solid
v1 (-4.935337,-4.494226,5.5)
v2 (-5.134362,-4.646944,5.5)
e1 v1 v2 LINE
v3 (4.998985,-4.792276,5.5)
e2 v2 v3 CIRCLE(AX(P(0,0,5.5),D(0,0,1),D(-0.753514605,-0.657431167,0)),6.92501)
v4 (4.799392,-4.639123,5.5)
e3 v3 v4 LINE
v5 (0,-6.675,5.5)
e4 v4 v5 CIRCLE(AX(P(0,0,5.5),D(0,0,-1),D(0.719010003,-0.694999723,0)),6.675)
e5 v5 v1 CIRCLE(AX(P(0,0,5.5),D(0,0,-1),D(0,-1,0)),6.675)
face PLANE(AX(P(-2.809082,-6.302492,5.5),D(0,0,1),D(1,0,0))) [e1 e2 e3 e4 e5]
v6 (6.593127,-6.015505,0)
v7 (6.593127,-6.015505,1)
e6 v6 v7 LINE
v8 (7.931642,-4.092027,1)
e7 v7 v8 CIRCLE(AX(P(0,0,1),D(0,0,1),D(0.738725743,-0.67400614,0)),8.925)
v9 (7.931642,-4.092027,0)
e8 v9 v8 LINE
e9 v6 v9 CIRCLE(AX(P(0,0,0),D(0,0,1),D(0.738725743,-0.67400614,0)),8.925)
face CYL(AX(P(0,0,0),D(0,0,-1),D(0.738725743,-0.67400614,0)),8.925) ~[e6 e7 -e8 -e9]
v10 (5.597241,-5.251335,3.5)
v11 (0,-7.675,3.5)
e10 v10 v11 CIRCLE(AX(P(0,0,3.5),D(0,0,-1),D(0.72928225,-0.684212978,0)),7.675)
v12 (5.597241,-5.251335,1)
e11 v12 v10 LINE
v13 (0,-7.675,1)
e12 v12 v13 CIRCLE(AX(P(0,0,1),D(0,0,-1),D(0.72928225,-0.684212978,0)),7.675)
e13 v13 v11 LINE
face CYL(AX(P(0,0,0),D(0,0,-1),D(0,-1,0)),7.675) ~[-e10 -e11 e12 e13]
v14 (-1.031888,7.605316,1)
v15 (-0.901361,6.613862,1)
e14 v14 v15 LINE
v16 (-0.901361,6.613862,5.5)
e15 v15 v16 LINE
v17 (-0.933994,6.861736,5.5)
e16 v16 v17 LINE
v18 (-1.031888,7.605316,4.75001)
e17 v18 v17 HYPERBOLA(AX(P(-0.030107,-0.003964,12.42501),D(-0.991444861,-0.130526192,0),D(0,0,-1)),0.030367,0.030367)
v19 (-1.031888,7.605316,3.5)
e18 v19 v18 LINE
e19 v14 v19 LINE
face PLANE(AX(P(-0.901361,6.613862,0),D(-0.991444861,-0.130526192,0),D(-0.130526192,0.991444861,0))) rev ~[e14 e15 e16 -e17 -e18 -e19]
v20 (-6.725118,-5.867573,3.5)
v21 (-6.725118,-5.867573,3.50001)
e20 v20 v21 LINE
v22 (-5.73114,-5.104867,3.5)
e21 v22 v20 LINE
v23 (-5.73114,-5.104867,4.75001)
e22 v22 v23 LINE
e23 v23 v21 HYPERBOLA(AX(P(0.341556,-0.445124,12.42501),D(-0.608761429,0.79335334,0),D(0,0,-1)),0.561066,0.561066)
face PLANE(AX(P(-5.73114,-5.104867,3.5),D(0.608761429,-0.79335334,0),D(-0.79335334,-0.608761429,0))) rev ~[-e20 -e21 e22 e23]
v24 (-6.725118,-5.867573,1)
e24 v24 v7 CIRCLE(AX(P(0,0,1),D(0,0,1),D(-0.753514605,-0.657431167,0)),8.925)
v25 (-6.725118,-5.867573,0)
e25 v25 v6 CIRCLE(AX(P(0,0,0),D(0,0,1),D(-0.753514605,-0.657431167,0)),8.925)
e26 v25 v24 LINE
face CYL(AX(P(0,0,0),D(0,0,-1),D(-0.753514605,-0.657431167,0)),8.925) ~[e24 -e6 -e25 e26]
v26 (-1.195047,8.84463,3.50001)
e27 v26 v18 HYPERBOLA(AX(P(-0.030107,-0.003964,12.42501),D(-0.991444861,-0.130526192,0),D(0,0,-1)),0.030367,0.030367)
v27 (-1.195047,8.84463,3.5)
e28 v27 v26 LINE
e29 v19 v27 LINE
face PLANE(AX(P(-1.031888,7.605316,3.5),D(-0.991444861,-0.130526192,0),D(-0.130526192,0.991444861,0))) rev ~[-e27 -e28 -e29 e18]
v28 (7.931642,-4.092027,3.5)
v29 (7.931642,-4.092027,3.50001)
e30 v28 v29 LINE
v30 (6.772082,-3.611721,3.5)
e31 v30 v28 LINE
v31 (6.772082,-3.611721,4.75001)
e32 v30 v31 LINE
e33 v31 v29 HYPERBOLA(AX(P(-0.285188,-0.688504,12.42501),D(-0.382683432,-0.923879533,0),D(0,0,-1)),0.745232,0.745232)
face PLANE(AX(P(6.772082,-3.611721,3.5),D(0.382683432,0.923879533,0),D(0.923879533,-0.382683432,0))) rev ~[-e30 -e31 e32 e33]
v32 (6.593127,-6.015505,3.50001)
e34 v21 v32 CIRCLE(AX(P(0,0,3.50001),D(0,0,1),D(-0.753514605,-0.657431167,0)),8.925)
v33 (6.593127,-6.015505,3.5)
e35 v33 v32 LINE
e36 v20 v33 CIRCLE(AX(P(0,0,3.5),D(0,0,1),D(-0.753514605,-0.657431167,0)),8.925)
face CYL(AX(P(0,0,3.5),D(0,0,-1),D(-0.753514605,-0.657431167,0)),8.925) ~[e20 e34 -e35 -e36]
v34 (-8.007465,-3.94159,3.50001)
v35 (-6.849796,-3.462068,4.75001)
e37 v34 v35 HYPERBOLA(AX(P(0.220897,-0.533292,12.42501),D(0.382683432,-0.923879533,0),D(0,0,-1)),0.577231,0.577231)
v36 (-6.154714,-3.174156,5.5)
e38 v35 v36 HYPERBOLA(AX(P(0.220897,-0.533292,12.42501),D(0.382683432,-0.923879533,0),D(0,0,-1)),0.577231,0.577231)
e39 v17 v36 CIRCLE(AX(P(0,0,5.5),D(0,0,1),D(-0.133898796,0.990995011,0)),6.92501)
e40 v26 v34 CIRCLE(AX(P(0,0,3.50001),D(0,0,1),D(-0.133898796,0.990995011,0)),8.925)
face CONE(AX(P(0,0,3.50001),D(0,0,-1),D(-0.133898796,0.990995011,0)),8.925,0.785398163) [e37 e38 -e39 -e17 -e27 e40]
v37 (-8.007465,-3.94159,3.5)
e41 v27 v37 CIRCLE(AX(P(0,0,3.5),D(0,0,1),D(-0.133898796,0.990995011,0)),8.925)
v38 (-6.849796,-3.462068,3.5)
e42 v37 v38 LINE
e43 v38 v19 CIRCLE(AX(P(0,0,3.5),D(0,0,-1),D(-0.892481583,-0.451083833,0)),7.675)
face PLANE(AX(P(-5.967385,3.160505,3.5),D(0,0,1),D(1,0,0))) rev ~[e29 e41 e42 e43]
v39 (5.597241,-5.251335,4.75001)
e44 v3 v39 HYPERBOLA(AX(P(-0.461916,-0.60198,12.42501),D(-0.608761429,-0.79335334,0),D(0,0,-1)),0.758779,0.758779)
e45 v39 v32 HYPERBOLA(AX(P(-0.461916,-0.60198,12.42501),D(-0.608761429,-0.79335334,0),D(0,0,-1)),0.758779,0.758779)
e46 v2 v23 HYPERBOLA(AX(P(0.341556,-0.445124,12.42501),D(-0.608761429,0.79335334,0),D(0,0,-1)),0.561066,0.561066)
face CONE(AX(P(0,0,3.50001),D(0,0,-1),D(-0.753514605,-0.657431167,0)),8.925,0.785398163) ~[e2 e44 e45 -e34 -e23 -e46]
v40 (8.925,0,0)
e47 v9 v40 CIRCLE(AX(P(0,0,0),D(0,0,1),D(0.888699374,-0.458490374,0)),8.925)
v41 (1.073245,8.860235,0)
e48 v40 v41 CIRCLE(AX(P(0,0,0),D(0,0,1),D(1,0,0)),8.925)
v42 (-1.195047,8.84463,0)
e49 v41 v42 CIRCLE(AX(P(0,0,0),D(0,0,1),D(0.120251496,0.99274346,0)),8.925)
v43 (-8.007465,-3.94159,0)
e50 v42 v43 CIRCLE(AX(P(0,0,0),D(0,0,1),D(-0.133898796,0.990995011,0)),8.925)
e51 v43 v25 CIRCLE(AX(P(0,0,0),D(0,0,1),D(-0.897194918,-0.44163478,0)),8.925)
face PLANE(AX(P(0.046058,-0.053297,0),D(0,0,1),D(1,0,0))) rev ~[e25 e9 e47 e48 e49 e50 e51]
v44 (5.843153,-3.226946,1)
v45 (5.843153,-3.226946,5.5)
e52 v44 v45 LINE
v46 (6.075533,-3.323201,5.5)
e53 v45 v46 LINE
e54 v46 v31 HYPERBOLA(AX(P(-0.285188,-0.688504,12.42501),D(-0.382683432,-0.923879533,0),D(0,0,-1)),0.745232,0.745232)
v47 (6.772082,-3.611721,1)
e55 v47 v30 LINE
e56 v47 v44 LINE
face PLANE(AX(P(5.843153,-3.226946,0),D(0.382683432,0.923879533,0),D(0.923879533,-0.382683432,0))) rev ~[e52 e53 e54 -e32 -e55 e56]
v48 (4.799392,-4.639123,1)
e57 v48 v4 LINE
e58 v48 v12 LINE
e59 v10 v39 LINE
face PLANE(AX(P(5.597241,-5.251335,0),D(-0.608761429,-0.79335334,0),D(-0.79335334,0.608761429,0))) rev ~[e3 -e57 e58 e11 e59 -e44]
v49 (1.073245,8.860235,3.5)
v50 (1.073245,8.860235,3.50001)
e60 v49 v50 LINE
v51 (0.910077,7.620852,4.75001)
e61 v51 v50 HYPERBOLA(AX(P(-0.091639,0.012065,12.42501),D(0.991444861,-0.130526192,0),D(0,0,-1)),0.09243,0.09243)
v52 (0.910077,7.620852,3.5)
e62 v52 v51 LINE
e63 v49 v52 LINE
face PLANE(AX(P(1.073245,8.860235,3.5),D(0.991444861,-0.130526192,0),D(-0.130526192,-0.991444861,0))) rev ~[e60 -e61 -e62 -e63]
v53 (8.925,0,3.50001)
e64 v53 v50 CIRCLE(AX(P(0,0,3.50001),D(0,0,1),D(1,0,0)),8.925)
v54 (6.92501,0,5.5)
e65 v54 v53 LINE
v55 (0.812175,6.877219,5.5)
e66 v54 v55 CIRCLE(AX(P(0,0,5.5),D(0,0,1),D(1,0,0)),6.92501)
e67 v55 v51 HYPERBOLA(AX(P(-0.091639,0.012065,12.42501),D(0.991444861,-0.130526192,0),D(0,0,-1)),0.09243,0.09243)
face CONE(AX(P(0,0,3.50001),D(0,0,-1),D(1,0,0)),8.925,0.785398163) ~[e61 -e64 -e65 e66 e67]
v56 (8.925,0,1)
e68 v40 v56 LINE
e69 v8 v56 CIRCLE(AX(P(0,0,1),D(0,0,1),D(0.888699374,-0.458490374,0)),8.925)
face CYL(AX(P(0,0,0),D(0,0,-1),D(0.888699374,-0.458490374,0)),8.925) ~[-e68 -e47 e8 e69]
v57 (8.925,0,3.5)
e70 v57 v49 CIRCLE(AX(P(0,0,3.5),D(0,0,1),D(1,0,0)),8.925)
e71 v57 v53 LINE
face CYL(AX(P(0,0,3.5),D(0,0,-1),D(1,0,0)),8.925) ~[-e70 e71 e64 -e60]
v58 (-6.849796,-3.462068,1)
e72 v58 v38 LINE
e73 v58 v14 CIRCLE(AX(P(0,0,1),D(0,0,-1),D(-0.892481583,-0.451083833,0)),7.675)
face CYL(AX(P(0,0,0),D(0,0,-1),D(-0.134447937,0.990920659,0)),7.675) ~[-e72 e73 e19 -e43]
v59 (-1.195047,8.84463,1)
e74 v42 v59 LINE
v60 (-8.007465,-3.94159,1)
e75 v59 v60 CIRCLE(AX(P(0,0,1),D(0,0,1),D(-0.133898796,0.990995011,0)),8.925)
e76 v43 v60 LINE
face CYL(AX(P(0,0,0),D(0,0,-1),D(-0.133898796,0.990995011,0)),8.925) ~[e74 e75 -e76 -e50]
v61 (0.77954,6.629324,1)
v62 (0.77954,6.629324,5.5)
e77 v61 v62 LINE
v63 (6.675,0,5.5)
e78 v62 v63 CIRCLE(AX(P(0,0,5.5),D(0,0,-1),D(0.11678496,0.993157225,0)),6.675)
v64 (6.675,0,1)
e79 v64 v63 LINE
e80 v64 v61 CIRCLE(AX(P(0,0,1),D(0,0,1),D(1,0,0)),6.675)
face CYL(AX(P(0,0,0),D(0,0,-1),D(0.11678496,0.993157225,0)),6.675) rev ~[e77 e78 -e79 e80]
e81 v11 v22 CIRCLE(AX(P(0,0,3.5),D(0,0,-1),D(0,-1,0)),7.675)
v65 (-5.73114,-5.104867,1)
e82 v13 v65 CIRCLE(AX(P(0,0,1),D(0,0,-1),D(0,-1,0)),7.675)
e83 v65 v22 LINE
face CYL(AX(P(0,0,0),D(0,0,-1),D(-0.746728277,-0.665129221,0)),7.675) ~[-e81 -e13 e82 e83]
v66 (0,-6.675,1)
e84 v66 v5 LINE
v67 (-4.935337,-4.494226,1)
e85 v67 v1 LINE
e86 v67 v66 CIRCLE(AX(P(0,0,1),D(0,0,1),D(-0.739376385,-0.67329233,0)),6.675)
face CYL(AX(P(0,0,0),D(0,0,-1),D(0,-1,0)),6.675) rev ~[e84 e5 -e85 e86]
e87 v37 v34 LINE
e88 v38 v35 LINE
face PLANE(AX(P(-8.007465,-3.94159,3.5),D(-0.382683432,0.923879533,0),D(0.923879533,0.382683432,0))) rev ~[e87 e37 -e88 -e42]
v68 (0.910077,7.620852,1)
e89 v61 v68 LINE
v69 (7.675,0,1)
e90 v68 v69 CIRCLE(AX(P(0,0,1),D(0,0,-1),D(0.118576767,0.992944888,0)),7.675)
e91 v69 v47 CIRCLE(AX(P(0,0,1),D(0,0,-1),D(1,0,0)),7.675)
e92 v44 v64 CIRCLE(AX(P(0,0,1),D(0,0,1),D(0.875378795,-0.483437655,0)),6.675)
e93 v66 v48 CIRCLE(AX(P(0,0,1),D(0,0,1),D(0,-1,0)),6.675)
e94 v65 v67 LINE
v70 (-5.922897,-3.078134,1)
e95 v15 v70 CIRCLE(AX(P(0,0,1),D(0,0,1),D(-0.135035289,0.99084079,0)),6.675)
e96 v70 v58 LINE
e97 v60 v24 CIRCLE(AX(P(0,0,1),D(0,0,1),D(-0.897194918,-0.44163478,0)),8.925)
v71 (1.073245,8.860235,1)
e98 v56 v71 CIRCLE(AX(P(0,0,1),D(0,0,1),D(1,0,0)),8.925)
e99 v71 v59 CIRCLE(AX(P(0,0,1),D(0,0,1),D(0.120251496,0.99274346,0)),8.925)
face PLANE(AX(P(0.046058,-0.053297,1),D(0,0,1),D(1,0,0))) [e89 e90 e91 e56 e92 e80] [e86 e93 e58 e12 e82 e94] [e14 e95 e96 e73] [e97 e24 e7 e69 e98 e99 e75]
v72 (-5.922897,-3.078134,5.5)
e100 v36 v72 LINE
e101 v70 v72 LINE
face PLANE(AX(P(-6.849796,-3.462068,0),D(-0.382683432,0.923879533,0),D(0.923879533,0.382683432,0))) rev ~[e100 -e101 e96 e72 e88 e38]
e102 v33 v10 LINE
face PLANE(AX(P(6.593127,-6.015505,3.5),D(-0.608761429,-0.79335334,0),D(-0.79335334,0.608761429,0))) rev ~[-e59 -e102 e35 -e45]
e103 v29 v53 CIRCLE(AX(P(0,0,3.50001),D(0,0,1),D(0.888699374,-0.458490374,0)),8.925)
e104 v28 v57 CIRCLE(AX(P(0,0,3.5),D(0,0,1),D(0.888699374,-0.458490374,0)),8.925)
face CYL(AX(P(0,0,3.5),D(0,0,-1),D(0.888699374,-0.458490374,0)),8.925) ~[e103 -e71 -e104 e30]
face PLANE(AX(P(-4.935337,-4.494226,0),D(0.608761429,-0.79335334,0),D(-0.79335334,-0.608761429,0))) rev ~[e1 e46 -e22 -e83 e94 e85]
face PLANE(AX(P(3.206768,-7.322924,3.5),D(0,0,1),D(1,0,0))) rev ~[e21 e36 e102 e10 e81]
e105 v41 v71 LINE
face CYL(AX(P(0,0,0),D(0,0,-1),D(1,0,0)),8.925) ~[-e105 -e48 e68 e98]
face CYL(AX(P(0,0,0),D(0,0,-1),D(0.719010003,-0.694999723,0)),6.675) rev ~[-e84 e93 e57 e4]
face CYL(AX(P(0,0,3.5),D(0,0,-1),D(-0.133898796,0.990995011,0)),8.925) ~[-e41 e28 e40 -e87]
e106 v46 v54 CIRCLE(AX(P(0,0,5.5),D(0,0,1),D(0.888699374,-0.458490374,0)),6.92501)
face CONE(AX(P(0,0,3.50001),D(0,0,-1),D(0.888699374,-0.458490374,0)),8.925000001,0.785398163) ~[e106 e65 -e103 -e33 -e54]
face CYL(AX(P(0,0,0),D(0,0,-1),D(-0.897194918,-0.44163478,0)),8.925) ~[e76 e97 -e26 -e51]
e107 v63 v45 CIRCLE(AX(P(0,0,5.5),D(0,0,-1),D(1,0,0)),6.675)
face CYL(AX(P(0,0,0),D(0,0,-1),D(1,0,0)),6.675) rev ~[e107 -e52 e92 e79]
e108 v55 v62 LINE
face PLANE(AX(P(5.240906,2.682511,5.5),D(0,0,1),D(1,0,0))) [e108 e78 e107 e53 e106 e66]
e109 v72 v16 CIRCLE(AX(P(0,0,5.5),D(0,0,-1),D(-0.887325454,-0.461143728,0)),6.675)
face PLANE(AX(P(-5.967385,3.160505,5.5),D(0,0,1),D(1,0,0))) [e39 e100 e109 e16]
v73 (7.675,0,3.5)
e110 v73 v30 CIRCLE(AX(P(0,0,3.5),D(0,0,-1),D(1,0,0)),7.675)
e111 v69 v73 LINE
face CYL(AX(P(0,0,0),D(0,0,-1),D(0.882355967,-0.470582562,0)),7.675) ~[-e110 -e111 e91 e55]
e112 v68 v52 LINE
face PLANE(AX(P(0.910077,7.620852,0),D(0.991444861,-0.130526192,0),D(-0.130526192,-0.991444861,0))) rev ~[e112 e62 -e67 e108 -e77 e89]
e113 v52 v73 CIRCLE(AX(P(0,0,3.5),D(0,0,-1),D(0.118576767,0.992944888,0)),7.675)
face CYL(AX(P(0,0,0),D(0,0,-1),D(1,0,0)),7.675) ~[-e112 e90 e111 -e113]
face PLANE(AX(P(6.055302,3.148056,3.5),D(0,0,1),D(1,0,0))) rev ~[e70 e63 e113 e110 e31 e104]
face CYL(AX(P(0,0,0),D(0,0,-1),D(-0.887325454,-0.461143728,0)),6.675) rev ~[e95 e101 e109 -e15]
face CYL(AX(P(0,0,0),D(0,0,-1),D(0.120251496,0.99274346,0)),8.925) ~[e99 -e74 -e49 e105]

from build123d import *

# Parameters (mm, degrees)
F1_DEPTH = 1
F2_DEPTH = 5.5
F3_START = 3.5
F3_DEPTH = 2
F4_SIZE  = 1.99999


# Not quite as in the source:
# - a fillet or chamfer is up to 0.001 mm smaller than in the source, because OpenCascade refuses the exact size


with BuildPart() as f1:
    # F0 (on Top) → F1 (new body)
    with BuildSketch(Plane.XY):
        with BuildLine():
            ThreePointArc((6.675, 0), (4.9879380463, 4.4357749094), (0.7795396115, 6.6293244749))
            ThreePointArc((0.7795396115, 6.6293244749), (-0.0613991479, 6.6747176079), (-0.9013605528, 6.6138622721))
            ThreePointArc((-0.9013605528, 6.6138622721), (-5.9267464923, 3.0707166942), (-5.9228974074, -3.0781343864))
            ThreePointArc((-5.9228974074, -3.0781343864), (-5.4750931221, -3.8182430914), (-4.9353373694, -4.4942263016))
            ThreePointArc((-4.9353373694, -4.4942263016), (-2.6978384344, -6.1055133103), (0, -6.675))
            ThreePointArc((0, -6.675), (2.6066720123, -6.1449886916), (4.7993917719, -4.6391231521))
            ThreePointArc((4.7993917719, -4.6391231521), (5.3679142179, -3.9675082796), (5.8431534535, -3.2269463459))
            ThreePointArc((5.8431534535, -3.2269463459), (6.4636937699, -1.6662196281), (6.675, 0))
        make_face()
        with BuildLine():
            Line((-5.9228974074, -3.0781343864), (-6.849796149, -3.4620684161))
            ThreePointArc((-6.849796149, -3.4620684161), (-6.3438696558, -4.3198313381), (-5.7311395238, -5.1048667718))
            Line((-5.7311395238, -5.1048667718), (-4.9353373694, -4.4942263016))
            ThreePointArc((-4.9353373694, -4.4942263016), (-5.4750931221, -3.8182430914), (-5.9228974074, -3.0781343864))
        make_face()
        with BuildLine():
            Line((-6.849796149, -3.4620684161), (-8.0074646458, -3.9415904082))
            ThreePointArc((-8.0074646458, -3.9415904082), (-7.4289702623, -4.9463143695), (-6.7251178515, -5.8675731681))
            Line((-6.7251178515, -5.8675731681), (-5.7311395238, -5.1048667718))
            ThreePointArc((-5.7311395238, -5.1048667718), (-6.3438696558, -4.3198313381), (-6.849796149, -3.4620684161))
        make_face()
        with BuildLine():
            Line((0.9100766885, 7.6208520141), (1.0732446043, 8.8602353817))
            ThreePointArc((1.0732446043, 8.8602353817), (-0.0613988555, 8.9247888031), (-1.1950467583, 8.8446304754))
            Line((-1.1950467583, 8.8446304754), (-1.0318879198, 7.6053160566))
            ThreePointArc((-1.0318879198, 7.6053160566), (-0.0613989862, 7.6747544042), (0.9100766885, 7.6208520141))
        make_face()
        with BuildLine():
            Line((-1.0318879198, 7.6053160566), (-1.1950467583, 8.8446304754))
            ThreePointArc((-1.1950467583, 8.8446304754), (-7.8767642568, 4.196690344), (-8.0074646458, -3.9415904082))
            Line((-8.0074646458, -3.9415904082), (-6.849796149, -3.4620684161))
            ThreePointArc((-6.849796149, -3.4620684161), (-6.7935252783, 3.5712237809), (-1.0318879198, 7.6053160566))
        make_face()
        with BuildLine():
            ThreePointArc((-6.7251178515, -5.8675731681), (-3.6937470456, -8.1247681667), (0, -8.925))
            Line((0, -8.925), (0, -7.675))
            ThreePointArc((0, -7.675), (-3.1405232467, -7.0030521015), (-5.7311395238, -5.1048667718))
            Line((-5.7311395238, -5.1048667718), (-6.7251178515, -5.8675731681))
        make_face()
        with BuildLine():
            ThreePointArc((0, -8.925), (3.6032793864, -8.1652925645), (6.5931272563, -6.0155047986))
            Line((6.5931272563, -6.0155047986), (5.597241272, -5.2513346059))
            ThreePointArc((5.597241272, -5.2513346059), (3.0497239137, -7.043068156), (0, -7.675))
            Line((0, -7.675), (0, -8.925))
        make_face()
        with BuildLine():
            ThreePointArc((6.5931272563, -6.0155047986), (7.3257881446, -5.0978871172), (7.9316419101, -4.0920265895))
            Line((7.9316419101, -4.0920265895), (6.7720820443, -3.6117211667))
            ThreePointArc((6.7720820443, -3.6117211667), (6.2387597231, -4.4702910551), (5.597241272, -5.2513346059))
            Line((5.597241272, -5.2513346059), (6.5931272563, -6.0155047986))
        make_face()
        with BuildLine():
            ThreePointArc((7.9316419101, -4.0920265895), (8.6731058176, -2.1054359349), (8.925, 0))
            ThreePointArc((8.925, 0), (6.679608263, 5.9193292233), (1.0732446043, 8.8602353817))
            Line((1.0732446043, 8.8602353817), (0.9100766885, 7.6208520141))
            ThreePointArc((0.9100766885, 7.6208520141), (5.7397937064, 5.0951342679), (7.675, 0))
            ThreePointArc((7.675, 0), (7.4458496725, -1.8614369866), (6.7720820443, -3.6117211667))
            Line((6.7720820443, -3.6117211667), (7.9316419101, -4.0920265895))
        make_face()
        with BuildLine():
            ThreePointArc((5.597241272, -5.2513346059), (6.2387597231, -4.4702910551), (6.7720820443, -3.6117211667))
            Line((6.7720820443, -3.6117211667), (5.8431534535, -3.2269463459))
            ThreePointArc((5.8431534535, -3.2269463459), (5.3679142179, -3.9675082796), (4.7993917719, -4.6391231521))
            Line((4.7993917719, -4.6391231521), (5.597241272, -5.2513346059))
        make_face()
        with BuildLine():
            Line((0.7795396115, 6.6293244749), (0.9100766885, 7.6208520141))
            ThreePointArc((0.9100766885, 7.6208520141), (-0.0613989862, 7.6747544042), (-1.0318879198, 7.6053160566))
            Line((-1.0318879198, 7.6053160566), (-0.9013605528, 6.6138622721))
            ThreePointArc((-0.9013605528, 6.6138622721), (-0.0613991479, 6.6747176079), (0.7795396115, 6.6293244749))
        make_face()
    extrude(amount=F1_DEPTH)

    # F0 (on Top) → F2 (join)
    with BuildSketch(Plane.XY):
        with BuildLine():
            Line((-0.9013605528, 6.6138622721), (-1.0318879198, 7.6053160566))
            ThreePointArc((-1.0318879198, 7.6053160566), (-6.7935252783, 3.5712237809), (-6.849796149, -3.4620684161))
            Line((-6.849796149, -3.4620684161), (-5.9228974074, -3.0781343864))
            ThreePointArc((-5.9228974074, -3.0781343864), (-5.9267464923, 3.0707166942), (-0.9013605528, 6.6138622721))
        make_face()
        with BuildLine():
            ThreePointArc((7.675, 0), (5.7397937064, 5.0951342679), (0.9100766885, 7.6208520141))
            Line((0.9100766885, 7.6208520141), (0.7795396115, 6.6293244749))
            ThreePointArc((0.7795396115, 6.6293244749), (4.9879380463, 4.4357749094), (6.675, 0))
            ThreePointArc((6.675, 0), (6.4636937699, -1.6662196281), (5.8431534535, -3.2269463459))
            Line((5.8431534535, -3.2269463459), (6.7720820443, -3.6117211667))
            ThreePointArc((6.7720820443, -3.6117211667), (7.4458496725, -1.8614369866), (7.675, 0))
        make_face()
        with BuildLine():
            ThreePointArc((-5.7311395238, -5.1048667718), (-3.1405232467, -7.0030521015), (0, -7.675))
            Line((0, -7.675), (0, -6.675))
            ThreePointArc((0, -6.675), (-2.6978384344, -6.1055133103), (-4.9353373694, -4.4942263016))
            Line((-4.9353373694, -4.4942263016), (-5.7311395238, -5.1048667718))
        make_face()
        with BuildLine():
            ThreePointArc((0, -7.675), (3.0497239137, -7.043068156), (5.597241272, -5.2513346059))
            Line((5.597241272, -5.2513346059), (4.7993917719, -4.6391231521))
            ThreePointArc((4.7993917719, -4.6391231521), (2.6066720123, -6.1449886916), (0, -6.675))
            Line((0, -6.675), (0, -7.675))
        make_face()
    extrude(amount=F2_DEPTH)

    # F0 (on Top) → F3 (join)
    with BuildSketch(Plane.XY.offset(F3_START)):
        with BuildLine():
            Line((-1.0318879198, 7.6053160566), (-1.1950467583, 8.8446304754))
            ThreePointArc((-1.1950467583, 8.8446304754), (-7.8767642568, 4.196690344), (-8.0074646458, -3.9415904082))
            Line((-8.0074646458, -3.9415904082), (-6.849796149, -3.4620684161))
            ThreePointArc((-6.849796149, -3.4620684161), (-6.7935252783, 3.5712237809), (-1.0318879198, 7.6053160566))
        make_face()
        with BuildLine():
            ThreePointArc((7.9316419101, -4.0920265895), (8.6731058176, -2.1054359349), (8.925, 0))
            ThreePointArc((8.925, 0), (6.679608263, 5.9193292233), (1.0732446043, 8.8602353817))
            Line((1.0732446043, 8.8602353817), (0.9100766885, 7.6208520141))
            ThreePointArc((0.9100766885, 7.6208520141), (5.7397937064, 5.0951342679), (7.675, 0))
            ThreePointArc((7.675, 0), (7.4458496725, -1.8614369866), (6.7720820443, -3.6117211667))
            Line((6.7720820443, -3.6117211667), (7.9316419101, -4.0920265895))
        make_face()
        with BuildLine():
            ThreePointArc((0, -8.925), (3.6032793864, -8.1652925645), (6.5931272563, -6.0155047986))
            Line((6.5931272563, -6.0155047986), (5.597241272, -5.2513346059))
            ThreePointArc((5.597241272, -5.2513346059), (3.0497239137, -7.043068156), (0, -7.675))
            Line((0, -7.675), (0, -8.925))
        make_face()
        with BuildLine():
            ThreePointArc((-6.7251178515, -5.8675731681), (-3.6937470456, -8.1247681667), (0, -8.925))
            Line((0, -8.925), (0, -7.675))
            ThreePointArc((0, -7.675), (-3.1405232467, -7.0030521015), (-5.7311395238, -5.1048667718))
            Line((-5.7311395238, -5.1048667718), (-6.7251178515, -5.8675731681))
        make_face()
    extrude(amount=F3_DEPTH)

    # F4 (size 2 in the source; OpenCascade refuses exactly that, so slightly less here)
    f4_edges = [f1.edges().sort_by_distance(p)[0] for p in [
        (-7.876764, 4.19669, 5.5),
        (-0.099128, -8.924449, 5.5),
        (7.887475, 4.176525, 5.5),
    ]]
    chamfer(f4_edges, length=F4_SIZE)


solid = f1.part
